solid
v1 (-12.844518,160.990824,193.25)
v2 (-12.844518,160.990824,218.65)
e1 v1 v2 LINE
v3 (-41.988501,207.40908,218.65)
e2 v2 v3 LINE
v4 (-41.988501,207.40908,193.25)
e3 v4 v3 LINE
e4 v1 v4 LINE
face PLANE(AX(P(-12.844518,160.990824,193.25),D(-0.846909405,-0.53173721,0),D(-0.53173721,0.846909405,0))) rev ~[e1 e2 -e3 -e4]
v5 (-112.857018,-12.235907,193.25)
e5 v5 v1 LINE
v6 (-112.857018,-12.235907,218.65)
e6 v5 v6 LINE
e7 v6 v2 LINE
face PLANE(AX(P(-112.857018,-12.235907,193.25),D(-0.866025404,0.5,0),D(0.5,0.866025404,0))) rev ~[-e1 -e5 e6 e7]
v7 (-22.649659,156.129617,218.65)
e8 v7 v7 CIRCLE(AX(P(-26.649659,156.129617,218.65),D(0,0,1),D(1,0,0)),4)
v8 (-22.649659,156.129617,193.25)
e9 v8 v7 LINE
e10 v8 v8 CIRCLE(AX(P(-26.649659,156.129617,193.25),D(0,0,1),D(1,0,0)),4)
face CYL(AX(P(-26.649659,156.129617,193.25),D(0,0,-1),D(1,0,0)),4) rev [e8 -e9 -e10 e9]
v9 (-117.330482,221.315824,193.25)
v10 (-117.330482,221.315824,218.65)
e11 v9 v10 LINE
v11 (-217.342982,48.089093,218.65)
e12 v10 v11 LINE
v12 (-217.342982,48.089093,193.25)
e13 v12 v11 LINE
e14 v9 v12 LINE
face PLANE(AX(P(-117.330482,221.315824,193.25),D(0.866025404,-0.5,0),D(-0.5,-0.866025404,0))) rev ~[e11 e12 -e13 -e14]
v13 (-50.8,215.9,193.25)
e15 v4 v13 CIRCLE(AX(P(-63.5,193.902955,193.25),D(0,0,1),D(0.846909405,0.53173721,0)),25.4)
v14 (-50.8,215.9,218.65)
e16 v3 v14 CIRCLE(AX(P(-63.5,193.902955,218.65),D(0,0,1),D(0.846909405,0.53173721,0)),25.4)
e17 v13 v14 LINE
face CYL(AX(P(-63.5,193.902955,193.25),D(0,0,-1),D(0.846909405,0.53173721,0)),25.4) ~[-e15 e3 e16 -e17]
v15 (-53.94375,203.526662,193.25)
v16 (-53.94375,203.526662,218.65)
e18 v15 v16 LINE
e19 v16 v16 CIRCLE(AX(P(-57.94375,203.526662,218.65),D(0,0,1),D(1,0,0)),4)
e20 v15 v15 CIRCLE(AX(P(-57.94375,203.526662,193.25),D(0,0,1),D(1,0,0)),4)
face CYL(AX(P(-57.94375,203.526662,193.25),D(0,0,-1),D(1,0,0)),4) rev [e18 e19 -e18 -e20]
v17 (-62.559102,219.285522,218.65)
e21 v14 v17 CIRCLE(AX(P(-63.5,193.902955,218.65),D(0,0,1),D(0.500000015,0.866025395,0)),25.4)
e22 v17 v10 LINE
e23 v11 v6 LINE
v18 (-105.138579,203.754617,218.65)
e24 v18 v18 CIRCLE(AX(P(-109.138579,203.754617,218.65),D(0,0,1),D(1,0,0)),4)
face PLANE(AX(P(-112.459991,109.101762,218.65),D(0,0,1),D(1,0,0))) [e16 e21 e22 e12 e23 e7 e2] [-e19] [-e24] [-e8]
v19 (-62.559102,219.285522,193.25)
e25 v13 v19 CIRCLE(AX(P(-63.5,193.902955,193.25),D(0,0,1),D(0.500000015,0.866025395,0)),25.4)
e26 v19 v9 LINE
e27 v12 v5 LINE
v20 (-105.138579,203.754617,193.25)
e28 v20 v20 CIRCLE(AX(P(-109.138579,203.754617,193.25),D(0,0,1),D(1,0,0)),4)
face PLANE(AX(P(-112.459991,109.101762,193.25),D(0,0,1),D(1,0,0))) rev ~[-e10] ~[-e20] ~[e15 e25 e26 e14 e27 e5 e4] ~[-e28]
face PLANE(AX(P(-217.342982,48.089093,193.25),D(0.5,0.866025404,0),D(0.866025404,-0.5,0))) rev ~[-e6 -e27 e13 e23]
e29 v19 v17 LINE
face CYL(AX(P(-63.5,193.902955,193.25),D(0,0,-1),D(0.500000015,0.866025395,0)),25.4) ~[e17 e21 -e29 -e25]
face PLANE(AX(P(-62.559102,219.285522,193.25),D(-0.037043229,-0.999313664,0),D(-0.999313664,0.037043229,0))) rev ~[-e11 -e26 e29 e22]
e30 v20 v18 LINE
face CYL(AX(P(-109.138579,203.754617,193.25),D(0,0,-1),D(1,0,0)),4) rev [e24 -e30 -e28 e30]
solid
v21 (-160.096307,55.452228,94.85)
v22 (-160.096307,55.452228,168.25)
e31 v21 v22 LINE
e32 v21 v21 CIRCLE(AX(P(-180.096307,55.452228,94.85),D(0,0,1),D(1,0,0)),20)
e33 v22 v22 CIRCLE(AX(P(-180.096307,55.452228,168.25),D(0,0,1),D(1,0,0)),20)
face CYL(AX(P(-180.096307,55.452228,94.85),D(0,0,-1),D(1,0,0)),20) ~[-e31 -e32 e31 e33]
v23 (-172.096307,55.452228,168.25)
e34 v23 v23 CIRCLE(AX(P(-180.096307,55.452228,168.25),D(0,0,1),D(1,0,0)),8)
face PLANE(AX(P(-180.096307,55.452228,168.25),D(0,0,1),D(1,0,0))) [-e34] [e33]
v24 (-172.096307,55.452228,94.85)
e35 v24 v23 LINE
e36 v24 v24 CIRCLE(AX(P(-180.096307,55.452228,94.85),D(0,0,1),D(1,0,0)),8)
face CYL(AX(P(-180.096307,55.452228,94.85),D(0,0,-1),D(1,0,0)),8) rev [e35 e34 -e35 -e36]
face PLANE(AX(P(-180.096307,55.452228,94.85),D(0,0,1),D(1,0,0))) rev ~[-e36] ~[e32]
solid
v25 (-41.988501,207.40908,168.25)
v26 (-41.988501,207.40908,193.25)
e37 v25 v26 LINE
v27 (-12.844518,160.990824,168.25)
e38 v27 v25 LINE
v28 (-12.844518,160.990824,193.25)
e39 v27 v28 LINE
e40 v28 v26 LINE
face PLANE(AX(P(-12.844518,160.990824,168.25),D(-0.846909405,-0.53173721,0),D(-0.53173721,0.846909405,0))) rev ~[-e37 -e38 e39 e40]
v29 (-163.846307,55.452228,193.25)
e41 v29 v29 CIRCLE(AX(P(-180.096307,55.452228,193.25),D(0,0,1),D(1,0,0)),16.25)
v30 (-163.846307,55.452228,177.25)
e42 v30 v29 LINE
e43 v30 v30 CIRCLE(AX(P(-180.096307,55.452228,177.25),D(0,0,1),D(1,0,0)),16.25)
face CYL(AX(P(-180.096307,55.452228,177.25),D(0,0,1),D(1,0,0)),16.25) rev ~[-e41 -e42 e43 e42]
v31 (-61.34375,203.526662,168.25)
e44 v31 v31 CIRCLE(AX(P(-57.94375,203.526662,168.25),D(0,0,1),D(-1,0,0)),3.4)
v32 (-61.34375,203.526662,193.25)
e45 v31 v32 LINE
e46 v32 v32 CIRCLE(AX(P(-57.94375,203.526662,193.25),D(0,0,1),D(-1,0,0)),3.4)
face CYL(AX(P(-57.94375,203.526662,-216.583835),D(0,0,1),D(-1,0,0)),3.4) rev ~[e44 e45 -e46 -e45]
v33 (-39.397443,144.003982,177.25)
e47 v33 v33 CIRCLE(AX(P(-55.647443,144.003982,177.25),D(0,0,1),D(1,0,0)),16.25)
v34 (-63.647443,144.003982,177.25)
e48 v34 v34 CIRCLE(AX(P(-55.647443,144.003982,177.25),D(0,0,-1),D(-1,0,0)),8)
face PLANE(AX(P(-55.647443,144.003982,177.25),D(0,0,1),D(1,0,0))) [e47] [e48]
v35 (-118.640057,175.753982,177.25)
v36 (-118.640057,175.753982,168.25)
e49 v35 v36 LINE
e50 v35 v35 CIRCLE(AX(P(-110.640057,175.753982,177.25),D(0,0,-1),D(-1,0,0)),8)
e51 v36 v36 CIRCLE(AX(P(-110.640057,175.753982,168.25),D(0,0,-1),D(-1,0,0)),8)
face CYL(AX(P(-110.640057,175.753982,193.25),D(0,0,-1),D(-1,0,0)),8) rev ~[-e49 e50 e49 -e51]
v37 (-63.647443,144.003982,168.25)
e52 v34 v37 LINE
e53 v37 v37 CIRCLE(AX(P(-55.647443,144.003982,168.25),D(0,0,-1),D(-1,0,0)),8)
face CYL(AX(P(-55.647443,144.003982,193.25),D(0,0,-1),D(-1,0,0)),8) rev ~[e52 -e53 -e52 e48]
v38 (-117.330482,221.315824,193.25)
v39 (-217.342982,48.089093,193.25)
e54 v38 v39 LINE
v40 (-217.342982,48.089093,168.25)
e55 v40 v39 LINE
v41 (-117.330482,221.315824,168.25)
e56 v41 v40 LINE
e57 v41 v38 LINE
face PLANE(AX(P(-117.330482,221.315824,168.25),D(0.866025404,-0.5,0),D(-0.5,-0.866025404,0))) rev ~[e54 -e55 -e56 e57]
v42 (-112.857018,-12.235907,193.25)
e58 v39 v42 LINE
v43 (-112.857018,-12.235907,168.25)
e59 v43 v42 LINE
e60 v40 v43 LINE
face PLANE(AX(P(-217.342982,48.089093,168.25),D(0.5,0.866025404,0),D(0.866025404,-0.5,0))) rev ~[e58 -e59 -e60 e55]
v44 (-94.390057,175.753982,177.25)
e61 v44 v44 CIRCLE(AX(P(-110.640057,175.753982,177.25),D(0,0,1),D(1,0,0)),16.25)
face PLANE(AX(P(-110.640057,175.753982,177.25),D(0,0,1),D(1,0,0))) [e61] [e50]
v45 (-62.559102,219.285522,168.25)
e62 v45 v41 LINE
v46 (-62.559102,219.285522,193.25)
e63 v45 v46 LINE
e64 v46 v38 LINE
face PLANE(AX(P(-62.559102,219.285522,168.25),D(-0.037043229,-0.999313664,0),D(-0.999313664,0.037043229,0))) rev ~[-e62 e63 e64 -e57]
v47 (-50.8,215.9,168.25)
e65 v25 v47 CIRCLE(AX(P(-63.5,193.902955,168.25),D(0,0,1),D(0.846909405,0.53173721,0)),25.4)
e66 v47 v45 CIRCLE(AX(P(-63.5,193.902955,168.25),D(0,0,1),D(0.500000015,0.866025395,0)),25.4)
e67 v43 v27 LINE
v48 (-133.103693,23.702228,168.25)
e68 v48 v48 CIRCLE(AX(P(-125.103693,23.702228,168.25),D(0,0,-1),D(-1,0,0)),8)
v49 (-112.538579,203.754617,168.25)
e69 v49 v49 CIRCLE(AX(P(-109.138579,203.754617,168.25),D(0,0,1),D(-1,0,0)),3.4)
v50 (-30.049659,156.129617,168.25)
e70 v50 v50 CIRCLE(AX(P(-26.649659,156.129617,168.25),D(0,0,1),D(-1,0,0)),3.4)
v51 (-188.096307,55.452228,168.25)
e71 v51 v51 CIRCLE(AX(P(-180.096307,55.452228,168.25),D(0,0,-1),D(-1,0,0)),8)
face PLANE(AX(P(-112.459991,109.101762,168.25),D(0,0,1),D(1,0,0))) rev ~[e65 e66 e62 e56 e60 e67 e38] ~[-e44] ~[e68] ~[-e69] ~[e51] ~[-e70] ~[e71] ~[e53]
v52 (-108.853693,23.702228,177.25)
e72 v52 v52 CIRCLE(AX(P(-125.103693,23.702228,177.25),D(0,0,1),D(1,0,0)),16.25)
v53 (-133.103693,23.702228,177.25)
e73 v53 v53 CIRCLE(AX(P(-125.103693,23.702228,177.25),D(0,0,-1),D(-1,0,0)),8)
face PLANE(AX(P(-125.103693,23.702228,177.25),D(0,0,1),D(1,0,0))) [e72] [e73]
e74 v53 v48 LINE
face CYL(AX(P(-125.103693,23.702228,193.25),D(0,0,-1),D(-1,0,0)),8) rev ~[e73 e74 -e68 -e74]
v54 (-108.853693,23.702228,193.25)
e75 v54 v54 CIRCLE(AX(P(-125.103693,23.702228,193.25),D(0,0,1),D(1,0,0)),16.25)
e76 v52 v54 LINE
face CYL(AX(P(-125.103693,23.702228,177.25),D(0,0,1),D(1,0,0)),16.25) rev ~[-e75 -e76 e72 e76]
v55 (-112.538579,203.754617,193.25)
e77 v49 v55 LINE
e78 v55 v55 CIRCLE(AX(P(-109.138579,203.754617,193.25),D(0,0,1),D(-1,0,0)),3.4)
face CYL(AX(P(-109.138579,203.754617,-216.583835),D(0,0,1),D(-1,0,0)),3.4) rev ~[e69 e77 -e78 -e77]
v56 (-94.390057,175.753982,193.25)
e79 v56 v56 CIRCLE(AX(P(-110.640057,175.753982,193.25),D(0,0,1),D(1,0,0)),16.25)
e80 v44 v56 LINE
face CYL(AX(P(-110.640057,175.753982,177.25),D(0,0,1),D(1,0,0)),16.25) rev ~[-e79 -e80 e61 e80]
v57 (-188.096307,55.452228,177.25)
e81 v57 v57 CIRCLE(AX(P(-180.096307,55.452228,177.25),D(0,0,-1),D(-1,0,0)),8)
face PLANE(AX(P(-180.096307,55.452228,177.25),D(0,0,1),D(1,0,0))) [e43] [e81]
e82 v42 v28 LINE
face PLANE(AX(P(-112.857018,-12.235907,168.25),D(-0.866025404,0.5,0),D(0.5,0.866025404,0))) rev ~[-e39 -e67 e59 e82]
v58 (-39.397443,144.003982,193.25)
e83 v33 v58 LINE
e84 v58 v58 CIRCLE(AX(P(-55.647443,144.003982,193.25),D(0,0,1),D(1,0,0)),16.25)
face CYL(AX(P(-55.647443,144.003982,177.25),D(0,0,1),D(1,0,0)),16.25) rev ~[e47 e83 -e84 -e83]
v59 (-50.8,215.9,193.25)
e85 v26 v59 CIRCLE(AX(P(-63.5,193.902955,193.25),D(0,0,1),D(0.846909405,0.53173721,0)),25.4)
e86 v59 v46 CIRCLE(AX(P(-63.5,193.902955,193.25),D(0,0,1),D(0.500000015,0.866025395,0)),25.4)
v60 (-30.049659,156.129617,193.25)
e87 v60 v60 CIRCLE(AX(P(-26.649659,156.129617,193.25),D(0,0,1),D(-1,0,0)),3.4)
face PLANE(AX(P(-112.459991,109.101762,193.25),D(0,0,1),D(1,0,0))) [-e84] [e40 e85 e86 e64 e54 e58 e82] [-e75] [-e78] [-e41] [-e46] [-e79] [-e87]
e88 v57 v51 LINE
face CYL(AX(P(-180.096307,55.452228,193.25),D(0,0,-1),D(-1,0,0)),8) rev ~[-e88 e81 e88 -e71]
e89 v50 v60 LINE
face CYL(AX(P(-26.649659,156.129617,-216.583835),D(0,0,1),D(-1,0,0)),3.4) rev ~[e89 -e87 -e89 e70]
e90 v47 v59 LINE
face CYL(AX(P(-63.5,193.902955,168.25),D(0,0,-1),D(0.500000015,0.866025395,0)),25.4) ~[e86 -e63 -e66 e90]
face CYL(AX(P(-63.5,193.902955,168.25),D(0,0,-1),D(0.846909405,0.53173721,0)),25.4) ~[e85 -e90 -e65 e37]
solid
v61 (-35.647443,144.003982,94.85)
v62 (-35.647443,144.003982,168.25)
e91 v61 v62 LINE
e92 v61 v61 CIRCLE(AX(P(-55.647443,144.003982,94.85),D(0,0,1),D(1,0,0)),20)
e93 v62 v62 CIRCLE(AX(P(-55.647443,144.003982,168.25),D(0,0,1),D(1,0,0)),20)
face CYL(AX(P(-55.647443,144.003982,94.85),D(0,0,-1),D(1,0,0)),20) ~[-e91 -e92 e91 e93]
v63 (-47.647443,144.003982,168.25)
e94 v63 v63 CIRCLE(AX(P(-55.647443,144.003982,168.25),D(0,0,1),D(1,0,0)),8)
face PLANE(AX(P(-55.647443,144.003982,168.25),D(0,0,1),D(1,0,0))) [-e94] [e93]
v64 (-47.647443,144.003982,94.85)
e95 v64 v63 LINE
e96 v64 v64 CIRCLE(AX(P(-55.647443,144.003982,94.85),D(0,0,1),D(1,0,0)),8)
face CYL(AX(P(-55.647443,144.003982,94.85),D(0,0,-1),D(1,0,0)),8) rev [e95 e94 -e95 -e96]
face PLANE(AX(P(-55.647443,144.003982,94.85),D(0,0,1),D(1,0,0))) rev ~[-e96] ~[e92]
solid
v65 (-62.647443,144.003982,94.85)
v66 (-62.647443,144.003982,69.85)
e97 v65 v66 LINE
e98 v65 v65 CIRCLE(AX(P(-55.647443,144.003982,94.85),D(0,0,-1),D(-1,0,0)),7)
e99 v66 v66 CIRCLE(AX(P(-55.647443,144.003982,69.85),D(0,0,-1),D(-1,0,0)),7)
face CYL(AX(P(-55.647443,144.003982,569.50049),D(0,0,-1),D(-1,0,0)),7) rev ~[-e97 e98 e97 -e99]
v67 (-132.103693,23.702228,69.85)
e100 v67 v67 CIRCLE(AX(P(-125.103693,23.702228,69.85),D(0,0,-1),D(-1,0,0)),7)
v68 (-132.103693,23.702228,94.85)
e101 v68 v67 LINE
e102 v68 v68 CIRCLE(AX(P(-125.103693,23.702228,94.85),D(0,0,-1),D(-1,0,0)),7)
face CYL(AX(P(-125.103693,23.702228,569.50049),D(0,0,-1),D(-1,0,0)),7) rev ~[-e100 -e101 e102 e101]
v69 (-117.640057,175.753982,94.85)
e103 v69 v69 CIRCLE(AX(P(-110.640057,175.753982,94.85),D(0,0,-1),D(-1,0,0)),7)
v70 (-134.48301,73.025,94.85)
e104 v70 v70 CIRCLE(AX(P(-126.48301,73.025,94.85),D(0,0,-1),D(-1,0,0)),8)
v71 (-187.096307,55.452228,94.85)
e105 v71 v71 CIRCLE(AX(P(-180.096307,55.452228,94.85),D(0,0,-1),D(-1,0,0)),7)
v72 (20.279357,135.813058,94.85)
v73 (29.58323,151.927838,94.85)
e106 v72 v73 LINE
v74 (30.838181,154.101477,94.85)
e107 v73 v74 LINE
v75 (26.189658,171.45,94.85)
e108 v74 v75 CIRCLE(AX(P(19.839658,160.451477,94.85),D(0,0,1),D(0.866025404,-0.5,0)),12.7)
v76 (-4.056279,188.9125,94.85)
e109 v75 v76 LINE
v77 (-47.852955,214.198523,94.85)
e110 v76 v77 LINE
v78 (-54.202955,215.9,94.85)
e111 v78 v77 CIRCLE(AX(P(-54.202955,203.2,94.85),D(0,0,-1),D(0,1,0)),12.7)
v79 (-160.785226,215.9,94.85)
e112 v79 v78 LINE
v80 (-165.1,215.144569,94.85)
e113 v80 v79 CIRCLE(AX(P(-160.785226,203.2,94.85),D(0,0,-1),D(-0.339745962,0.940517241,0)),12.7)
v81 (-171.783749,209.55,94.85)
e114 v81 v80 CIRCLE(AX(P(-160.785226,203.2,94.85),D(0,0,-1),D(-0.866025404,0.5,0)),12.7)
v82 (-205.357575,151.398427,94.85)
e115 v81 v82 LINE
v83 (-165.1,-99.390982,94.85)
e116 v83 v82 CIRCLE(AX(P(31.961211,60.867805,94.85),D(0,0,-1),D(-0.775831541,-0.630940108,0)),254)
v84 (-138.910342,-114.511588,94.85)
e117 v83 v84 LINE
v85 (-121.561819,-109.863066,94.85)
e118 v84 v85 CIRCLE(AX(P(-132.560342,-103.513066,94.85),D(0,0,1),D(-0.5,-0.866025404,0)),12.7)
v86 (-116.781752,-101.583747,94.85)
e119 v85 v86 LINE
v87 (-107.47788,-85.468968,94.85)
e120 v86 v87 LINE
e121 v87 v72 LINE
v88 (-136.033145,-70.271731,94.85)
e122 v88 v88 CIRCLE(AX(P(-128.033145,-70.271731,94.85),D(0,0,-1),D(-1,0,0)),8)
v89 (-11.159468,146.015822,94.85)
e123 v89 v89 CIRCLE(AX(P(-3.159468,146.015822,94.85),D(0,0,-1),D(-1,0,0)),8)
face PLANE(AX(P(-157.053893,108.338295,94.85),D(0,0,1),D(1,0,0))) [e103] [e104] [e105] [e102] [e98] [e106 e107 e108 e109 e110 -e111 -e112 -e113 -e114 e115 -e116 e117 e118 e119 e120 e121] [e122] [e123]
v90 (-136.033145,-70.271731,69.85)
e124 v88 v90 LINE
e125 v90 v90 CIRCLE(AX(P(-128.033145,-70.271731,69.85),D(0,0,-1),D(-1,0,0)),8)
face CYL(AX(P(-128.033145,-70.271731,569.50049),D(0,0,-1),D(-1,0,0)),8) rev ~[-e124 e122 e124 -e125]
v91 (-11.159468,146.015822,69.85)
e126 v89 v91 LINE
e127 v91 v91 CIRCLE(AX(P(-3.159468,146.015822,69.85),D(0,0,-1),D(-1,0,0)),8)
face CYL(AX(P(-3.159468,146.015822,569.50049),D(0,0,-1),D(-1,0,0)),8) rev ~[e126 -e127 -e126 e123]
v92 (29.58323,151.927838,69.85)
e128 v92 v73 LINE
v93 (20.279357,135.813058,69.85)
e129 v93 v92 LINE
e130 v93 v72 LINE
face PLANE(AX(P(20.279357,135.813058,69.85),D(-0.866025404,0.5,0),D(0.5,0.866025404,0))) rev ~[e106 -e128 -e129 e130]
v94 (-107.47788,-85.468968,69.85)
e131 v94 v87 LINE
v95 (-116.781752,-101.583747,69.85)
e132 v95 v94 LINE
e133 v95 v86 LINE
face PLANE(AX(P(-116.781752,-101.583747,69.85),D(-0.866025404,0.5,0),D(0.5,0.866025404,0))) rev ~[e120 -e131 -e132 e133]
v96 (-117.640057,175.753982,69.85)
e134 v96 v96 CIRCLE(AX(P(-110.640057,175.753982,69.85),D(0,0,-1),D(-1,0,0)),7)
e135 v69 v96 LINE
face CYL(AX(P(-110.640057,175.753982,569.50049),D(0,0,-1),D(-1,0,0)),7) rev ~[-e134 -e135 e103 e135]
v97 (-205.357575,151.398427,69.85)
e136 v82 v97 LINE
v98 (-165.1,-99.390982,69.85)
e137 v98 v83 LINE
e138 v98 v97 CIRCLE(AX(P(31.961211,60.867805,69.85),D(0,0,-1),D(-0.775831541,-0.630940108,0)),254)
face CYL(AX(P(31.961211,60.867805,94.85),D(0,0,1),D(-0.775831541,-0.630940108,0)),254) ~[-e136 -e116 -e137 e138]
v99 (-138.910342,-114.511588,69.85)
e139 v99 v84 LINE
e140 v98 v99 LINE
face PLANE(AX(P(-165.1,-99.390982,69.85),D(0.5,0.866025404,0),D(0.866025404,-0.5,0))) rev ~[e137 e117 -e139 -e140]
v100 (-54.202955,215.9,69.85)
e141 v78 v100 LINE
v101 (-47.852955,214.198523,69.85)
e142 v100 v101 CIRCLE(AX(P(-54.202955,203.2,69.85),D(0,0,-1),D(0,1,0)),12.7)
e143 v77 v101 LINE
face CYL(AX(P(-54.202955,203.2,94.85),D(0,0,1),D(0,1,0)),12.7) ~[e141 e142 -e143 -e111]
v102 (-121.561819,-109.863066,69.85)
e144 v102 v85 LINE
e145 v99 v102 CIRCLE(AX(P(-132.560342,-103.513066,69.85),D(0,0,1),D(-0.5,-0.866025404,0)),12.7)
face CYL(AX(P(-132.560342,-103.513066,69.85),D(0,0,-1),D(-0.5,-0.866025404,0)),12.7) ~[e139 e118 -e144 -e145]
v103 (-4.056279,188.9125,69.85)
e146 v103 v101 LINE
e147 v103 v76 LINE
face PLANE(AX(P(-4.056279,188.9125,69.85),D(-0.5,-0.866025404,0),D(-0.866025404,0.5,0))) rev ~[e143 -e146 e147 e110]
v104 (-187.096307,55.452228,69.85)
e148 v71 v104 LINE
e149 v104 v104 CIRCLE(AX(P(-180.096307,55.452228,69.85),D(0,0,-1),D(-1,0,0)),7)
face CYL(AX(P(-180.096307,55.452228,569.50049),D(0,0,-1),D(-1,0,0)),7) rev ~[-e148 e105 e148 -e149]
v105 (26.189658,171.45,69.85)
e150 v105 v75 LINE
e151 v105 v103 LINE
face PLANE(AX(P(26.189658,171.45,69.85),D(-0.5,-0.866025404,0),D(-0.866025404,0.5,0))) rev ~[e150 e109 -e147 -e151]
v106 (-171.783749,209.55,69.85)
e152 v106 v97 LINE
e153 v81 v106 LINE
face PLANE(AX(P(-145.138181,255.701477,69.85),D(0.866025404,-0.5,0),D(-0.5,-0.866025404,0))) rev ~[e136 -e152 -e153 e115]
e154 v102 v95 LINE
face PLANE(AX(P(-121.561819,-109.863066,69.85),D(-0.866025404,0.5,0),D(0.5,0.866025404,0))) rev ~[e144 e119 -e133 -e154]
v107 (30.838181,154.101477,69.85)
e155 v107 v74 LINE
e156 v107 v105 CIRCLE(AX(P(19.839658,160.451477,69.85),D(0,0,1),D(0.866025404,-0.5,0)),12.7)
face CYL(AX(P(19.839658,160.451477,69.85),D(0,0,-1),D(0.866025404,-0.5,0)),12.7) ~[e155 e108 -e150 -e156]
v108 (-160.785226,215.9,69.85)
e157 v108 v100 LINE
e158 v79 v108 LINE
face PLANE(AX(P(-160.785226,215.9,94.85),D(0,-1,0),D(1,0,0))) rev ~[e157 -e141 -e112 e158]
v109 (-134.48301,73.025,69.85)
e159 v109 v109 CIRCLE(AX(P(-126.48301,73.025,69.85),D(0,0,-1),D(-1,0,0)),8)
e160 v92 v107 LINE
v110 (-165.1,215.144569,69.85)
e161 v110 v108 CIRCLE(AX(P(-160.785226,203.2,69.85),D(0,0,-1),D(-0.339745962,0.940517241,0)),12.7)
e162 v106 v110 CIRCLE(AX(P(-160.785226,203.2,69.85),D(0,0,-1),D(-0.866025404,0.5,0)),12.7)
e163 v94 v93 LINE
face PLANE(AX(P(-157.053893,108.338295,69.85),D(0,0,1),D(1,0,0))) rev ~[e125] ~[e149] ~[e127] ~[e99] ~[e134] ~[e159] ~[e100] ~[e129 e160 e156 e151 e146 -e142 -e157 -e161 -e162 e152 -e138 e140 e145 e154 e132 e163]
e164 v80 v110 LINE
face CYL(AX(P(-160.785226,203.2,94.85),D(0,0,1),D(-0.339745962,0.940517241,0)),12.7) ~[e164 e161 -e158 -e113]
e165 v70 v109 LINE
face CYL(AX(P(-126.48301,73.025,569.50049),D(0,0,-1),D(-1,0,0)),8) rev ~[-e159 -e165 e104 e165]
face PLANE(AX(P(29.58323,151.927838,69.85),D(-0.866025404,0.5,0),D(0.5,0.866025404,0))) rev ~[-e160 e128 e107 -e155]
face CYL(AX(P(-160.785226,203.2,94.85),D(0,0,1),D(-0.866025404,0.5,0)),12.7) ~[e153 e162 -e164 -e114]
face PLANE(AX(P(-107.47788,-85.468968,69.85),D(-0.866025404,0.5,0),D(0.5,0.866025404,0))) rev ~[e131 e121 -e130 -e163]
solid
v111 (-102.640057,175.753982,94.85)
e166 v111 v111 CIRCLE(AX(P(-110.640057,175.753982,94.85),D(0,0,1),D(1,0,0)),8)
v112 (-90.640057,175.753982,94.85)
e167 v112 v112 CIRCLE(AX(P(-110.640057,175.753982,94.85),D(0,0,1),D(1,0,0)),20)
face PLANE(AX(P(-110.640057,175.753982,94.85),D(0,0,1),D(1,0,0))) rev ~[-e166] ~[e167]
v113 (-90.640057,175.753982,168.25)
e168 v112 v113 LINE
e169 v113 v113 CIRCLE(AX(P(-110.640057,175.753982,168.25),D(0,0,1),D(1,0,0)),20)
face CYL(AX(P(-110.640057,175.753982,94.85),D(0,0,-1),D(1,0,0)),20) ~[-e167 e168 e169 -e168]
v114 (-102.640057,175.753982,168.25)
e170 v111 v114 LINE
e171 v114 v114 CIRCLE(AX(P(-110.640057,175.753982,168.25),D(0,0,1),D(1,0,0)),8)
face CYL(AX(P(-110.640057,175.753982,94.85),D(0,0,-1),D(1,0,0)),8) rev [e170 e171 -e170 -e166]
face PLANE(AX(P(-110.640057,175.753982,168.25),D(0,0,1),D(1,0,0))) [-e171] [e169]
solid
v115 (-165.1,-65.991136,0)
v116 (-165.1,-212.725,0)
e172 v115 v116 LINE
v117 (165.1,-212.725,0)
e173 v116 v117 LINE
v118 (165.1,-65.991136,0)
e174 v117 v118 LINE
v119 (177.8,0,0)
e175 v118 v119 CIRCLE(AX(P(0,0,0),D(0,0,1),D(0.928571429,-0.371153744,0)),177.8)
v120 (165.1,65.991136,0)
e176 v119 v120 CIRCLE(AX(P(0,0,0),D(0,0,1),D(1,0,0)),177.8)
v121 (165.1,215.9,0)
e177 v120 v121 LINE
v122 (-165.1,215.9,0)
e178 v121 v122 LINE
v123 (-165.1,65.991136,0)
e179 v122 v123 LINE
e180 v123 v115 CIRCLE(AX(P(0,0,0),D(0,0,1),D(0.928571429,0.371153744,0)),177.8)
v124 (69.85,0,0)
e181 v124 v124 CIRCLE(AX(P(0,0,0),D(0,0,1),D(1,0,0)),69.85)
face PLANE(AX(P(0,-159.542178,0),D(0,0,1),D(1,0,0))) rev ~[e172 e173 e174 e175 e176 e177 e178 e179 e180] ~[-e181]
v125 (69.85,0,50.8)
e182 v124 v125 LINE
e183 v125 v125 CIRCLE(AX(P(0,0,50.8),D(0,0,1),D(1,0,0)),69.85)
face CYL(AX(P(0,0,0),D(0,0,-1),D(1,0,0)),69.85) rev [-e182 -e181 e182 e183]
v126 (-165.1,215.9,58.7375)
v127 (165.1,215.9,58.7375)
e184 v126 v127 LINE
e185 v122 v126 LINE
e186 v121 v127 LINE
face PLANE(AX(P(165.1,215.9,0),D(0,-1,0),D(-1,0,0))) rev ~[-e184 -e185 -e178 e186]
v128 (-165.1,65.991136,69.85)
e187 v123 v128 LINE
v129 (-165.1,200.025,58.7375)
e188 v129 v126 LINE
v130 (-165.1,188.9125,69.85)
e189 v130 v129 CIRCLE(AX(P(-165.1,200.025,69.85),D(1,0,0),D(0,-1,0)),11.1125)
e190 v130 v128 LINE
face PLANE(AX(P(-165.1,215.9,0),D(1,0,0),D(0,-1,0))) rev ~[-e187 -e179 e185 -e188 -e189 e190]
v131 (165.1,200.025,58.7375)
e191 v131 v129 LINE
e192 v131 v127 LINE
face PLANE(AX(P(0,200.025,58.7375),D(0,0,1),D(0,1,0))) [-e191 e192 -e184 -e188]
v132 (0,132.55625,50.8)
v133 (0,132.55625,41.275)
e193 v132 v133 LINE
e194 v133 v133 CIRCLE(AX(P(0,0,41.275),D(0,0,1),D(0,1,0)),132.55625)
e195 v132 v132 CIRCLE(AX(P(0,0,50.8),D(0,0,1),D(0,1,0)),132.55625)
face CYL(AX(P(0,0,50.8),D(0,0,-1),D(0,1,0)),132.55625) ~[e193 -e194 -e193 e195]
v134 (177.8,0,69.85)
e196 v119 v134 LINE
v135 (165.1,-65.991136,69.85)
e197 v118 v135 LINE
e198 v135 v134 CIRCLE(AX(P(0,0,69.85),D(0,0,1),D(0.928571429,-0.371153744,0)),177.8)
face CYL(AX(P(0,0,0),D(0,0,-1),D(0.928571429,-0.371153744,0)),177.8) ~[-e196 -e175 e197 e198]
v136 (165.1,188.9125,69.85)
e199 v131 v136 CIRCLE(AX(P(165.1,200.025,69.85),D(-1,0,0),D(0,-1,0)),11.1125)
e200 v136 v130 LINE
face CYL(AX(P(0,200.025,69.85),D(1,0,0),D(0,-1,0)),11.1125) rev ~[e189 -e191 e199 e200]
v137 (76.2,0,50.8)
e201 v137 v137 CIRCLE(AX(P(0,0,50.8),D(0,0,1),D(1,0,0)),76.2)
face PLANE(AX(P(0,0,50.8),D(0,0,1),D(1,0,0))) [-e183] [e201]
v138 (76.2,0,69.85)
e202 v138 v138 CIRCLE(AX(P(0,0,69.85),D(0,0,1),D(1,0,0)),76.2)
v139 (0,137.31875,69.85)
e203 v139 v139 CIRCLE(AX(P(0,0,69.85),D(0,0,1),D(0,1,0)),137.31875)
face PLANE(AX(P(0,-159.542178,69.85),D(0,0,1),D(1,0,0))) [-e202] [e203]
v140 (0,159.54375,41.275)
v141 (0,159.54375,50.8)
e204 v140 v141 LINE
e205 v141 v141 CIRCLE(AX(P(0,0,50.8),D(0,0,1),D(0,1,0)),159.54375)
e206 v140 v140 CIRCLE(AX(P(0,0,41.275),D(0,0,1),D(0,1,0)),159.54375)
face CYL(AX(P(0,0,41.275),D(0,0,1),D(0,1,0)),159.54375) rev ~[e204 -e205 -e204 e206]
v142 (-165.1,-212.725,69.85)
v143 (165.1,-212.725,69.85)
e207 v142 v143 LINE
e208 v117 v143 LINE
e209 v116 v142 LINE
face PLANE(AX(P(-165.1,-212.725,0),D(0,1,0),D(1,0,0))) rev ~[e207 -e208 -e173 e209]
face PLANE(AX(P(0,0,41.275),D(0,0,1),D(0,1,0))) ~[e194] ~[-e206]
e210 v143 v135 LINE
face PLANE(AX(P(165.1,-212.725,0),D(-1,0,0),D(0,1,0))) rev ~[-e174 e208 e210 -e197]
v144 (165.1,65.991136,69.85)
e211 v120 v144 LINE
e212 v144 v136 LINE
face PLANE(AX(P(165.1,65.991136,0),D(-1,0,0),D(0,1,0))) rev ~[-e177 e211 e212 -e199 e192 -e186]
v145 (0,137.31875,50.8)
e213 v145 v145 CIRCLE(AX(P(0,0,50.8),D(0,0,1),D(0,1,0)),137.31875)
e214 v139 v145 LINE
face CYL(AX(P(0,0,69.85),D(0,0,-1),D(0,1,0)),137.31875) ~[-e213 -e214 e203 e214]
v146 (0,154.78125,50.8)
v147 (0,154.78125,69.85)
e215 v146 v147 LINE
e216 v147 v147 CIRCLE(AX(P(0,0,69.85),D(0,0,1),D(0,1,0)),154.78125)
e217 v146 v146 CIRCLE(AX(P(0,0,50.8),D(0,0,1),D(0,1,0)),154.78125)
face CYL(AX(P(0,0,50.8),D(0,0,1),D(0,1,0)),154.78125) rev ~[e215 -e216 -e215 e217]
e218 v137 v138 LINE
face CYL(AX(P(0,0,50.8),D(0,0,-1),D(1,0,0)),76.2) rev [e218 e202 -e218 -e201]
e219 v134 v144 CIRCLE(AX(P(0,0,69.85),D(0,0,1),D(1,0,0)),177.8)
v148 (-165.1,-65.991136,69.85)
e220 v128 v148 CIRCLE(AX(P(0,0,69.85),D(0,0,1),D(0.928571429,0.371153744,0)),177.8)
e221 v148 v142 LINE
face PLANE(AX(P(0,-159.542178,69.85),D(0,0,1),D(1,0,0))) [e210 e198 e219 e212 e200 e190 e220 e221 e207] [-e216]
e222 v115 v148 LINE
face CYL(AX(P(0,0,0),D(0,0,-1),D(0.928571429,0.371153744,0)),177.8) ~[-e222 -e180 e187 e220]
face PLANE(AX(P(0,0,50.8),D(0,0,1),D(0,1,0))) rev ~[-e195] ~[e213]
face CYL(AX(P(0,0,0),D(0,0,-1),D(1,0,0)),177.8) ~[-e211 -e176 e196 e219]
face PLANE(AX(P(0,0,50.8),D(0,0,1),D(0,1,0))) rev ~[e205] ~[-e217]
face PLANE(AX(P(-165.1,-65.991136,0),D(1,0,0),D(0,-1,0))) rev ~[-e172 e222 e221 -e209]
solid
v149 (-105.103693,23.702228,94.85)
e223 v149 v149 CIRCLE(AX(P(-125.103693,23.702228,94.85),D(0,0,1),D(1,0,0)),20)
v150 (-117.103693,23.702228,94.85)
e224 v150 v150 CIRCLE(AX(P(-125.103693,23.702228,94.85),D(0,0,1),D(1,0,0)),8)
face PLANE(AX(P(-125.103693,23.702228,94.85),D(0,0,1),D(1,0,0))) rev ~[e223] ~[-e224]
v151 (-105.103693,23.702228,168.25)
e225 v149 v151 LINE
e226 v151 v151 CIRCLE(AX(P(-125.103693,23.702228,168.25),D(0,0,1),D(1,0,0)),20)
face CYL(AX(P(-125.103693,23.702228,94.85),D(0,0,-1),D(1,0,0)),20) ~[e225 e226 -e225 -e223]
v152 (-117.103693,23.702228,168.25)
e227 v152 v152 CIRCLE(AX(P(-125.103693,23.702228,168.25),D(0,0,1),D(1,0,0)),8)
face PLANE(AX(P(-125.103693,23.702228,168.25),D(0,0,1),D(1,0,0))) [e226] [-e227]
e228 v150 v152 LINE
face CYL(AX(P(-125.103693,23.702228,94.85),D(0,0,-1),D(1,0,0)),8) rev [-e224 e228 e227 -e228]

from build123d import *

# Parameters (mm, degrees)
F0_R            = 162.71875
F0_R_2          = 137.31875
F0_R_3          = 76.2
F0_R_4          = 69.85
F1_DEPTH        = 69.85
F2_START        = 50.8
F2_DEPTH        = 19.05
F4_DEPTH        = 177.801
F4_DEPTH_BACK   = 177.801
F8_DEPTH        = 25
F10_D           = 16
F13_START       = 98.4
F12_R           = 20
F12_R_2         = 8
F12_R_3         = 4
F13_DEPTH       = 25.4
F14_START       = 73.4
F14_DEPTH       = 25
F15_DEPTH       = 73.4
F17_D           = 16
F17_CBORE_D     = 32.5
F17_CBORE_DEPTH = 16
F18_D           = 6.8
F19_D           = 14
F21_DEPTH       = 25


# Not quite as in the source:
# - a feature names something its author has since deleted; it is built from what else it names


with BuildPart() as f1:
    # F0 (on Top) → F1 (new body)
    with BuildSketch(Plane.XY):
        with BuildLine():
            Line((165.1, -212.725), (165.1, -65.9911357684))
            ThreePointArc((165.1, -65.9911357684), (0, -177.8), (-165.1, -65.9911357684))
            Line((-165.1, -65.9911357684), (-165.1, -212.725))
            Line((-165.1, -212.725), (0, -212.725))
            Line((0, -212.725), (165.1, -212.725))
        make_face()
        with BuildLine():
            ThreePointArc((-165.1, 65.9911357684), (0, 177.8), (165.1, 65.9911357684))
            Line((165.1, 65.9911357684), (165.1, 215.9))
            Line((165.1, 215.9), (0, 215.9))
            Line((0, 215.9), (-165.1, 215.9))
            Line((-165.1, 215.9), (-165.1, 65.9911357684))
        make_face()
        with BuildLine():
            ThreePointArc((165.1, -65.9911357684), (174.5961339778, -33.6010416505), (177.8, 0))
            ThreePointArc((177.8, 0), (174.5961339778, 33.6010416505), (165.1, 65.9911357684))
            ThreePointArc((165.1, 65.9911357684), (0, 177.8), (-165.1, 65.9911357684))
            ThreePointArc((-165.1, 65.9911357684), (-177.8, 0), (-165.1, -65.9911357684))
            ThreePointArc((-165.1, -65.9911357684), (0, -177.8), (165.1, -65.9911357684))
        make_face()
        Circle(F0_R, mode=Mode.SUBTRACT)
        Circle(F0_R)
        Circle(F0_R_2, mode=Mode.SUBTRACT)
        Circle(F0_R_2)
        Circle(F0_R_3, mode=Mode.SUBTRACT)
        Circle(F0_R_3)
        Circle(F0_R_4, mode=Mode.SUBTRACT)
    extrude(amount=F1_DEPTH)

    # F0 (on Top) → F2 (cut)
    with BuildSketch(Plane.XY.offset(F2_START)):
        Circle(F0_R_3)
        Circle(F0_R_4, mode=Mode.SUBTRACT)
    extrude(amount=F2_DEPTH, mode=Mode.SUBTRACT)

    # F3 (on Right) → F4 (cut, two sides)
    with BuildSketch(Plane.YZ) as f4_sk:
        with BuildLine():
            Line((215.9, 58.7375), (215.9, 69.85))
            Line((215.9, 69.85), (188.9125, 69.85))
            ThreePointArc((188.9125, 69.85), (192.1672758941, 61.9922758941), (200.025, 58.7375))
            Line((200.025, 58.7375), (215.9, 58.7375))
        make_face()
    extrude(amount=-F4_DEPTH, mode=Mode.SUBTRACT)
    extrude(f4_sk.sketch, amount=F4_DEPTH_BACK, mode=Mode.SUBTRACT)

    # F3 (on Right) → F5 (revolve, cut)
    with BuildSketch(Plane.YZ):
        Polygon((154.78125, 50.8), (154.78125, 69.85), (137.31875, 69.85), (137.31875, 50.8), (132.55625, 50.8), (132.55625, 41.275), (159.54375, 41.275), (159.54375, 50.8), align=None)
    revolve(axis=Axis((0, 0, 34.925), (0, 0, 1)), mode=Mode.SUBTRACT)


with BuildPart() as f8:
    # F7 (on face) → F8 (new body)
    with BuildSketch(Plane.XY.offset(69.85)):
        with BuildLine():
            Line((-4.0562788307, 188.9125), (-50.8, 215.9))
            Line((-50.8, 215.9), (-127.7896583964, 260.35))
            ThreePointArc((-127.7896583964, 260.35), (-137.4266602692, 261.6187353658), (-145.1381810245, 255.7014773719))
            Line((-145.1381810245, 255.7014773719), (-253.0881810245, 68.7265926949))
            ThreePointArc((-253.0881810245, 68.7265926949), (-229.9227798824, -26.233366017), (-165.1, -99.3909820045))
            Line((-165.1, -99.3909820045), (-165.1, -65.9911357684))
            ThreePointArc((-165.1, -65.9911357684), (-177.8, 0), (-165.1, 65.9911357684))
            Line((-165.1, 65.9911357684), (-165.1, 188.9125))
            Line((-165.1, 188.9125), (-4.0562788307, 188.9125))
        make_face()
        with BuildLine():
            Line((26.1896583964, 171.45), (-4.0562788307, 188.9125))
            Line((-4.0562788307, 188.9125), (-165.1, 188.9125))
            Line((-165.1, 188.9125), (-165.1, 65.9911357684))
            ThreePointArc((-165.1, 65.9911357684), (-177.8, 0), (-165.1, -65.9911357684))
            Line((-165.1, -65.9911357684), (-165.1, -99.3909820045))
            Line((-165.1, -99.3909820045), (-138.9103416036, -114.5115883296))
            ThreePointArc((-138.9103416036, -114.5115883296), (-129.2733397308, -115.7803236954), (-121.5618189755, -109.8630657016))
            Line((-121.5618189755, -109.8630657016), (-116.7817522221, -101.5837472212))
            ThreePointArc((-116.7817522221, -101.5837472211), (-134.0444945295, 77.390625), (29.5832295941, 151.9278377334))
            Line((29.5832295941, 151.9278377334), (30.8381810245, 154.1014773719))
            ThreePointArc((30.8381810245, 154.1014773719), (32.1069163903, 163.7384792447), (26.1896583964, 171.45))
        make_face()
        with BuildLine():
            Line((-107.4778799044, -85.4689676597), (20.2793572763, 135.813058172))
            ThreePointArc((20.2793572763, 135.813058172), (-118.9215259159, 68.659375), (-107.4778799044, -85.4689676597))
        make_face()
        with BuildLine():
            Line((20.2793572763, 135.813058172), (29.5832295941, 151.9278377334))
            ThreePointArc((29.5832295941, 151.9278377334), (-134.0444945295, 77.390625), (-116.7817522221, -101.5837472211))
            Line((-116.7817522221, -101.5837472212), (-107.4778799044, -85.4689676597))
            ThreePointArc((-107.4778799044, -85.4689676597), (-118.9215259159, 68.659375), (20.2793572763, 135.813058172))
        make_face()
    extrude(amount=F8_DEPTH)

    # F10 (through all)
    with Locations(Plane.XY.offset(94.85)):
        with Locations((-3.1594679801, 146.015821958), (-126.4830102227, 73.025), (-128.0331451602, -70.2717314458)):
            Hole(F10_D / 2)

    # F19 (through all)
    with Locations(Plane.XY.offset(94.85)):
        with Locations((-55.6474434298, 144.0039816927), (-110.6400565702, 175.7539816927), (-125.1036934298, 23.7022277895), (-180.0963065702, 55.4522277895)):
            Hole(F19_D / 2)

    # F20 (on face) → F21 (cut, through all)
    with BuildSketch(Plane.XY.offset(94.85)):
        with BuildLine():
            Line((-205.3575752753, 151.3984269285), (-253.0881810245, 68.7265926949))
            ThreePointArc((-253.0881810245, 68.7265926949), (-229.9227798824, -26.233366017), (-165.1, -99.3909820045))
            ThreePointArc((-165.1, -99.3909820045), (-218.8281974346, 20.6102300699), (-205.3575752753, 151.3984269285))
        make_face()
        with BuildLine():
            Line((-145.1381810245, 255.7014773719), (-165.1, 221.1265926949))
            Line((-165.1, 221.1265926949), (-165.1, 215.9))
            Line((-165.1, 215.9), (-160.7852262806, 215.9))
            Line((-160.7852262806, 215.9), (-54.2029547439, 215.9))
            ThreePointArc((-54.2029547439, 215.9), (-50.9159528711, 215.4672579939), (-47.8529547439, 214.1985226281))
            Line((-47.8529547439, 214.1985226281), (-127.7896583964, 260.35))
            ThreePointArc((-127.7896583964, 260.35), (-137.4266602692, 261.6187353658), (-145.1381810245, 255.7014773719))
        make_face()
        with BuildLine():
            Line((-165.1, 221.1265926949), (-171.7837489087, 209.55))
            ThreePointArc((-171.7837489087, 209.55), (-168.9368556718, 212.9386312318), (-165.1, 215.1445689646))
            Line((-165.1, 215.1445689646), (-165.1, 215.9))
            Line((-165.1, 215.9), (-165.1, 221.1265926949))
        make_face()
        with BuildLine():
            Line((-165.1, 215.9), (-165.1, 215.1445689646))
            ThreePointArc((-165.1, 215.1445689646), (-162.9754287997, 215.7097167404), (-160.7852262806, 215.9))
            Line((-160.7852262806, 215.9), (-165.1, 215.9))
        make_face()
    extrude(amount=-F21_DEPTH, mode=Mode.SUBTRACT)


with BuildPart() as f13:
    # F12 (on face) → F13 (new body)
    with BuildSketch(Plane.XY.offset(94.85).offset(F13_START)):
        with BuildLine():
            ThreePointArc((-41.9885011187, 207.4090798685), (-45.8752843803, 212.1930996127), (-50.7999996193, 215.8999997802))
            ThreePointArc((-50.7999996193, 215.8999997802), (-56.472627292, 218.3114785178), (-62.5591019761, 219.2855218108))
            Line((-62.5591019761, 219.2855218108), (-117.3304824833, 221.3158240869))
            Line((-117.3304824833, 221.3158240869), (-217.3429824833, 48.0890926949))
            Line((-217.3429824833, 48.0890926949), (-165.1, 17.9265926949))
            Line((-165.1, 17.9265926949), (-112.8570175167, -12.2359073051))
            Line((-112.8570175167, -12.2359073051), (-12.8445175167, 160.9908240869))
            Line((-12.8445175167, 160.9908240869), (-41.9885011187, 207.4090798685))
        make_face()
        with Locations((-125.1036934298, 23.7022277895)):
            Circle(F12_R, mode=Mode.SUBTRACT)
        with Locations((-180.0963065702, 55.4522277895)):
            Circle(F12_R, mode=Mode.SUBTRACT)
        with Locations((-126.4830102227, 73.025)):
            Circle(F12_R_2, mode=Mode.SUBTRACT)
        with Locations((-110.6400565702, 175.7539816927)):
            Circle(F12_R, mode=Mode.SUBTRACT)
        with Locations((-55.6474434298, 144.0039816927)):
            Circle(F12_R, mode=Mode.SUBTRACT)
        with Locations((-26.6496594878, 156.1296167873)):
            Circle(F12_R_3, mode=Mode.SUBTRACT)
        with Locations((-109.1385791982, 203.7546167873)):
            Circle(F12_R_3, mode=Mode.SUBTRACT)
        with Locations((-57.94375, 203.5266620434)):
            Circle(F12_R_3, mode=Mode.SUBTRACT)
        with Locations((-55.6474434298, 144.0039816927)):
            Circle(F12_R)
        with Locations((-55.6474434298, 144.0039816927)):
            Circle(F12_R_2, mode=Mode.SUBTRACT)
        with Locations((-110.6400565702, 175.7539816927)):
            Circle(F12_R)
        with Locations((-110.6400565702, 175.7539816927)):
            Circle(F12_R_2, mode=Mode.SUBTRACT)
        with Locations((-125.1036934298, 23.7022277895)):
            Circle(F12_R)
        with Locations((-125.1036934298, 23.7022277895)):
            Circle(F12_R_2, mode=Mode.SUBTRACT)
        with Locations((-180.0963065702, 55.4522277895)):
            Circle(F12_R)
        with Locations((-180.0963065702, 55.4522277895)):
            Circle(F12_R_2, mode=Mode.SUBTRACT)
        with Locations((-55.6474434298, 144.0039816927)):
            Circle(F12_R_2)
        with Locations((-110.6400565702, 175.7539816927)):
            Circle(F12_R_2)
        with Locations((-125.1036934298, 23.7022277895)):
            Circle(F12_R_2)
        with Locations((-180.0963065702, 55.4522277895)):
            Circle(F12_R_2)
        with Locations((-126.4830102227, 73.025)):
            Circle(F12_R_2)
    extrude(amount=F13_DEPTH)


with BuildPart() as f14:
    # F12 (on face) → F14 (new body)
    with BuildSketch(Plane.XY.offset(94.85).offset(F14_START)):
        with BuildLine():
            ThreePointArc((-41.9885011187, 207.4090798685), (-45.8752843803, 212.1930996127), (-50.7999996193, 215.8999997802))
            ThreePointArc((-50.7999996193, 215.8999997802), (-56.472627292, 218.3114785178), (-62.5591019761, 219.2855218108))
            Line((-62.5591019761, 219.2855218108), (-117.3304824833, 221.3158240869))
            Line((-117.3304824833, 221.3158240869), (-217.3429824833, 48.0890926949))
            Line((-217.3429824833, 48.0890926949), (-165.1, 17.9265926949))
            Line((-165.1, 17.9265926949), (-112.8570175167, -12.2359073051))
            Line((-112.8570175167, -12.2359073051), (-12.8445175167, 160.9908240869))
            Line((-12.8445175167, 160.9908240869), (-41.9885011187, 207.4090798685))
        make_face()
        with Locations((-125.1036934298, 23.7022277895)):
            Circle(F12_R, mode=Mode.SUBTRACT)
        with Locations((-180.0963065702, 55.4522277895)):
            Circle(F12_R, mode=Mode.SUBTRACT)
        with Locations((-126.4830102227, 73.025)):
            Circle(F12_R_2, mode=Mode.SUBTRACT)
        with Locations((-110.6400565702, 175.7539816927)):
            Circle(F12_R, mode=Mode.SUBTRACT)
        with Locations((-55.6474434298, 144.0039816927)):
            Circle(F12_R, mode=Mode.SUBTRACT)
        with Locations((-26.6496594878, 156.1296167873)):
            Circle(F12_R_3, mode=Mode.SUBTRACT)
        with Locations((-109.1385791982, 203.7546167873)):
            Circle(F12_R_3, mode=Mode.SUBTRACT)
        with Locations((-57.94375, 203.5266620434)):
            Circle(F12_R_3, mode=Mode.SUBTRACT)
        with Locations((-55.6474434298, 144.0039816927)):
            Circle(F12_R)
        with Locations((-55.6474434298, 144.0039816927)):
            Circle(F12_R_2, mode=Mode.SUBTRACT)
        with Locations((-110.6400565702, 175.7539816927)):
            Circle(F12_R)
        with Locations((-110.6400565702, 175.7539816927)):
            Circle(F12_R_2, mode=Mode.SUBTRACT)
        with Locations((-125.1036934298, 23.7022277895)):
            Circle(F12_R)
        with Locations((-125.1036934298, 23.7022277895)):
            Circle(F12_R_2, mode=Mode.SUBTRACT)
        with Locations((-180.0963065702, 55.4522277895)):
            Circle(F12_R)
        with Locations((-180.0963065702, 55.4522277895)):
            Circle(F12_R_2, mode=Mode.SUBTRACT)
        with Locations((-55.6474434298, 144.0039816927)):
            Circle(F12_R_2)
        with Locations((-110.6400565702, 175.7539816927)):
            Circle(F12_R_2)
        with Locations((-125.1036934298, 23.7022277895)):
            Circle(F12_R_2)
        with Locations((-180.0963065702, 55.4522277895)):
            Circle(F12_R_2)
        with Locations((-126.4830102227, 73.025)):
            Circle(F12_R_2)
        with Locations((-57.94375, 203.5266620434)):
            Circle(F12_R_3)
        with Locations((-26.6496594878, 156.1296167873)):
            Circle(F12_R_3)
        with Locations((-109.1385791982, 203.7546167873)):
            Circle(F12_R_3)
    extrude(amount=F14_DEPTH)

    # F17 (through all)
    with Locations(Plane.XY.offset(193.25)):
        with Locations((-55.6474434298, 144.0039816927), (-110.6400565702, 175.7539816927), (-125.1036934298, 23.7022277895), (-180.0963065702, 55.4522277895)):
            CounterBoreHole(F17_D / 2, F17_CBORE_D / 2, F17_CBORE_DEPTH)

    # F18 (through all)
    with Locations(Plane(origin=(0, 0, 94.85), x_dir=(1, 0, 0), z_dir=(0, 0, -1))):
        with Locations((-26.6496594878, -156.1296167873), (-57.94375, -203.5266620434), (-109.1385791982, -203.7546167873)):
            Hole(F18_D / 2)


with BuildPart() as f15:
    # F12 (on face) → F15 (new body, through all)
    with BuildSketch(Plane.XY.offset(94.85)):
        with Locations((-55.6474434298, 144.0039816927)):
            Circle(F12_R)
        with Locations((-55.6474434298, 144.0039816927)):
            Circle(F12_R_2, mode=Mode.SUBTRACT)
    extrude(amount=F15_DEPTH)


with BuildPart() as f15b:
    # F12 (on face) → F15, piece 2 (new body, through all)
    with BuildSketch(Plane.XY.offset(94.85)):
        with Locations((-110.6400565702, 175.7539816927)):
            Circle(F12_R)
        with Locations((-110.6400565702, 175.7539816927)):
            Circle(F12_R_2, mode=Mode.SUBTRACT)
    extrude(amount=F15_DEPTH)


with BuildPart() as f15c:
    # F12 (on face) → F15, piece 3 (new body, through all)
    with BuildSketch(Plane.XY.offset(94.85)):
        with Locations((-180.0963065702, 55.4522277895)):
            Circle(F12_R)
        with Locations((-180.0963065702, 55.4522277895)):
            Circle(F12_R_2, mode=Mode.SUBTRACT)
    extrude(amount=F15_DEPTH)


with BuildPart() as f15d:
    # F12 (on face) → F15, piece 4 (new body, through all)
    with BuildSketch(Plane.XY.offset(94.85)):
        with Locations((-125.1036934298, 23.7022277895)):
            Circle(F12_R)
        with Locations((-125.1036934298, 23.7022277895)):
            Circle(F12_R_2, mode=Mode.SUBTRACT)
    extrude(amount=F15_DEPTH)


solid = Compound([f1.part, f8.part, f13.part, f14.part, f15.part, f15b.part, f15c.part, f15d.part])
